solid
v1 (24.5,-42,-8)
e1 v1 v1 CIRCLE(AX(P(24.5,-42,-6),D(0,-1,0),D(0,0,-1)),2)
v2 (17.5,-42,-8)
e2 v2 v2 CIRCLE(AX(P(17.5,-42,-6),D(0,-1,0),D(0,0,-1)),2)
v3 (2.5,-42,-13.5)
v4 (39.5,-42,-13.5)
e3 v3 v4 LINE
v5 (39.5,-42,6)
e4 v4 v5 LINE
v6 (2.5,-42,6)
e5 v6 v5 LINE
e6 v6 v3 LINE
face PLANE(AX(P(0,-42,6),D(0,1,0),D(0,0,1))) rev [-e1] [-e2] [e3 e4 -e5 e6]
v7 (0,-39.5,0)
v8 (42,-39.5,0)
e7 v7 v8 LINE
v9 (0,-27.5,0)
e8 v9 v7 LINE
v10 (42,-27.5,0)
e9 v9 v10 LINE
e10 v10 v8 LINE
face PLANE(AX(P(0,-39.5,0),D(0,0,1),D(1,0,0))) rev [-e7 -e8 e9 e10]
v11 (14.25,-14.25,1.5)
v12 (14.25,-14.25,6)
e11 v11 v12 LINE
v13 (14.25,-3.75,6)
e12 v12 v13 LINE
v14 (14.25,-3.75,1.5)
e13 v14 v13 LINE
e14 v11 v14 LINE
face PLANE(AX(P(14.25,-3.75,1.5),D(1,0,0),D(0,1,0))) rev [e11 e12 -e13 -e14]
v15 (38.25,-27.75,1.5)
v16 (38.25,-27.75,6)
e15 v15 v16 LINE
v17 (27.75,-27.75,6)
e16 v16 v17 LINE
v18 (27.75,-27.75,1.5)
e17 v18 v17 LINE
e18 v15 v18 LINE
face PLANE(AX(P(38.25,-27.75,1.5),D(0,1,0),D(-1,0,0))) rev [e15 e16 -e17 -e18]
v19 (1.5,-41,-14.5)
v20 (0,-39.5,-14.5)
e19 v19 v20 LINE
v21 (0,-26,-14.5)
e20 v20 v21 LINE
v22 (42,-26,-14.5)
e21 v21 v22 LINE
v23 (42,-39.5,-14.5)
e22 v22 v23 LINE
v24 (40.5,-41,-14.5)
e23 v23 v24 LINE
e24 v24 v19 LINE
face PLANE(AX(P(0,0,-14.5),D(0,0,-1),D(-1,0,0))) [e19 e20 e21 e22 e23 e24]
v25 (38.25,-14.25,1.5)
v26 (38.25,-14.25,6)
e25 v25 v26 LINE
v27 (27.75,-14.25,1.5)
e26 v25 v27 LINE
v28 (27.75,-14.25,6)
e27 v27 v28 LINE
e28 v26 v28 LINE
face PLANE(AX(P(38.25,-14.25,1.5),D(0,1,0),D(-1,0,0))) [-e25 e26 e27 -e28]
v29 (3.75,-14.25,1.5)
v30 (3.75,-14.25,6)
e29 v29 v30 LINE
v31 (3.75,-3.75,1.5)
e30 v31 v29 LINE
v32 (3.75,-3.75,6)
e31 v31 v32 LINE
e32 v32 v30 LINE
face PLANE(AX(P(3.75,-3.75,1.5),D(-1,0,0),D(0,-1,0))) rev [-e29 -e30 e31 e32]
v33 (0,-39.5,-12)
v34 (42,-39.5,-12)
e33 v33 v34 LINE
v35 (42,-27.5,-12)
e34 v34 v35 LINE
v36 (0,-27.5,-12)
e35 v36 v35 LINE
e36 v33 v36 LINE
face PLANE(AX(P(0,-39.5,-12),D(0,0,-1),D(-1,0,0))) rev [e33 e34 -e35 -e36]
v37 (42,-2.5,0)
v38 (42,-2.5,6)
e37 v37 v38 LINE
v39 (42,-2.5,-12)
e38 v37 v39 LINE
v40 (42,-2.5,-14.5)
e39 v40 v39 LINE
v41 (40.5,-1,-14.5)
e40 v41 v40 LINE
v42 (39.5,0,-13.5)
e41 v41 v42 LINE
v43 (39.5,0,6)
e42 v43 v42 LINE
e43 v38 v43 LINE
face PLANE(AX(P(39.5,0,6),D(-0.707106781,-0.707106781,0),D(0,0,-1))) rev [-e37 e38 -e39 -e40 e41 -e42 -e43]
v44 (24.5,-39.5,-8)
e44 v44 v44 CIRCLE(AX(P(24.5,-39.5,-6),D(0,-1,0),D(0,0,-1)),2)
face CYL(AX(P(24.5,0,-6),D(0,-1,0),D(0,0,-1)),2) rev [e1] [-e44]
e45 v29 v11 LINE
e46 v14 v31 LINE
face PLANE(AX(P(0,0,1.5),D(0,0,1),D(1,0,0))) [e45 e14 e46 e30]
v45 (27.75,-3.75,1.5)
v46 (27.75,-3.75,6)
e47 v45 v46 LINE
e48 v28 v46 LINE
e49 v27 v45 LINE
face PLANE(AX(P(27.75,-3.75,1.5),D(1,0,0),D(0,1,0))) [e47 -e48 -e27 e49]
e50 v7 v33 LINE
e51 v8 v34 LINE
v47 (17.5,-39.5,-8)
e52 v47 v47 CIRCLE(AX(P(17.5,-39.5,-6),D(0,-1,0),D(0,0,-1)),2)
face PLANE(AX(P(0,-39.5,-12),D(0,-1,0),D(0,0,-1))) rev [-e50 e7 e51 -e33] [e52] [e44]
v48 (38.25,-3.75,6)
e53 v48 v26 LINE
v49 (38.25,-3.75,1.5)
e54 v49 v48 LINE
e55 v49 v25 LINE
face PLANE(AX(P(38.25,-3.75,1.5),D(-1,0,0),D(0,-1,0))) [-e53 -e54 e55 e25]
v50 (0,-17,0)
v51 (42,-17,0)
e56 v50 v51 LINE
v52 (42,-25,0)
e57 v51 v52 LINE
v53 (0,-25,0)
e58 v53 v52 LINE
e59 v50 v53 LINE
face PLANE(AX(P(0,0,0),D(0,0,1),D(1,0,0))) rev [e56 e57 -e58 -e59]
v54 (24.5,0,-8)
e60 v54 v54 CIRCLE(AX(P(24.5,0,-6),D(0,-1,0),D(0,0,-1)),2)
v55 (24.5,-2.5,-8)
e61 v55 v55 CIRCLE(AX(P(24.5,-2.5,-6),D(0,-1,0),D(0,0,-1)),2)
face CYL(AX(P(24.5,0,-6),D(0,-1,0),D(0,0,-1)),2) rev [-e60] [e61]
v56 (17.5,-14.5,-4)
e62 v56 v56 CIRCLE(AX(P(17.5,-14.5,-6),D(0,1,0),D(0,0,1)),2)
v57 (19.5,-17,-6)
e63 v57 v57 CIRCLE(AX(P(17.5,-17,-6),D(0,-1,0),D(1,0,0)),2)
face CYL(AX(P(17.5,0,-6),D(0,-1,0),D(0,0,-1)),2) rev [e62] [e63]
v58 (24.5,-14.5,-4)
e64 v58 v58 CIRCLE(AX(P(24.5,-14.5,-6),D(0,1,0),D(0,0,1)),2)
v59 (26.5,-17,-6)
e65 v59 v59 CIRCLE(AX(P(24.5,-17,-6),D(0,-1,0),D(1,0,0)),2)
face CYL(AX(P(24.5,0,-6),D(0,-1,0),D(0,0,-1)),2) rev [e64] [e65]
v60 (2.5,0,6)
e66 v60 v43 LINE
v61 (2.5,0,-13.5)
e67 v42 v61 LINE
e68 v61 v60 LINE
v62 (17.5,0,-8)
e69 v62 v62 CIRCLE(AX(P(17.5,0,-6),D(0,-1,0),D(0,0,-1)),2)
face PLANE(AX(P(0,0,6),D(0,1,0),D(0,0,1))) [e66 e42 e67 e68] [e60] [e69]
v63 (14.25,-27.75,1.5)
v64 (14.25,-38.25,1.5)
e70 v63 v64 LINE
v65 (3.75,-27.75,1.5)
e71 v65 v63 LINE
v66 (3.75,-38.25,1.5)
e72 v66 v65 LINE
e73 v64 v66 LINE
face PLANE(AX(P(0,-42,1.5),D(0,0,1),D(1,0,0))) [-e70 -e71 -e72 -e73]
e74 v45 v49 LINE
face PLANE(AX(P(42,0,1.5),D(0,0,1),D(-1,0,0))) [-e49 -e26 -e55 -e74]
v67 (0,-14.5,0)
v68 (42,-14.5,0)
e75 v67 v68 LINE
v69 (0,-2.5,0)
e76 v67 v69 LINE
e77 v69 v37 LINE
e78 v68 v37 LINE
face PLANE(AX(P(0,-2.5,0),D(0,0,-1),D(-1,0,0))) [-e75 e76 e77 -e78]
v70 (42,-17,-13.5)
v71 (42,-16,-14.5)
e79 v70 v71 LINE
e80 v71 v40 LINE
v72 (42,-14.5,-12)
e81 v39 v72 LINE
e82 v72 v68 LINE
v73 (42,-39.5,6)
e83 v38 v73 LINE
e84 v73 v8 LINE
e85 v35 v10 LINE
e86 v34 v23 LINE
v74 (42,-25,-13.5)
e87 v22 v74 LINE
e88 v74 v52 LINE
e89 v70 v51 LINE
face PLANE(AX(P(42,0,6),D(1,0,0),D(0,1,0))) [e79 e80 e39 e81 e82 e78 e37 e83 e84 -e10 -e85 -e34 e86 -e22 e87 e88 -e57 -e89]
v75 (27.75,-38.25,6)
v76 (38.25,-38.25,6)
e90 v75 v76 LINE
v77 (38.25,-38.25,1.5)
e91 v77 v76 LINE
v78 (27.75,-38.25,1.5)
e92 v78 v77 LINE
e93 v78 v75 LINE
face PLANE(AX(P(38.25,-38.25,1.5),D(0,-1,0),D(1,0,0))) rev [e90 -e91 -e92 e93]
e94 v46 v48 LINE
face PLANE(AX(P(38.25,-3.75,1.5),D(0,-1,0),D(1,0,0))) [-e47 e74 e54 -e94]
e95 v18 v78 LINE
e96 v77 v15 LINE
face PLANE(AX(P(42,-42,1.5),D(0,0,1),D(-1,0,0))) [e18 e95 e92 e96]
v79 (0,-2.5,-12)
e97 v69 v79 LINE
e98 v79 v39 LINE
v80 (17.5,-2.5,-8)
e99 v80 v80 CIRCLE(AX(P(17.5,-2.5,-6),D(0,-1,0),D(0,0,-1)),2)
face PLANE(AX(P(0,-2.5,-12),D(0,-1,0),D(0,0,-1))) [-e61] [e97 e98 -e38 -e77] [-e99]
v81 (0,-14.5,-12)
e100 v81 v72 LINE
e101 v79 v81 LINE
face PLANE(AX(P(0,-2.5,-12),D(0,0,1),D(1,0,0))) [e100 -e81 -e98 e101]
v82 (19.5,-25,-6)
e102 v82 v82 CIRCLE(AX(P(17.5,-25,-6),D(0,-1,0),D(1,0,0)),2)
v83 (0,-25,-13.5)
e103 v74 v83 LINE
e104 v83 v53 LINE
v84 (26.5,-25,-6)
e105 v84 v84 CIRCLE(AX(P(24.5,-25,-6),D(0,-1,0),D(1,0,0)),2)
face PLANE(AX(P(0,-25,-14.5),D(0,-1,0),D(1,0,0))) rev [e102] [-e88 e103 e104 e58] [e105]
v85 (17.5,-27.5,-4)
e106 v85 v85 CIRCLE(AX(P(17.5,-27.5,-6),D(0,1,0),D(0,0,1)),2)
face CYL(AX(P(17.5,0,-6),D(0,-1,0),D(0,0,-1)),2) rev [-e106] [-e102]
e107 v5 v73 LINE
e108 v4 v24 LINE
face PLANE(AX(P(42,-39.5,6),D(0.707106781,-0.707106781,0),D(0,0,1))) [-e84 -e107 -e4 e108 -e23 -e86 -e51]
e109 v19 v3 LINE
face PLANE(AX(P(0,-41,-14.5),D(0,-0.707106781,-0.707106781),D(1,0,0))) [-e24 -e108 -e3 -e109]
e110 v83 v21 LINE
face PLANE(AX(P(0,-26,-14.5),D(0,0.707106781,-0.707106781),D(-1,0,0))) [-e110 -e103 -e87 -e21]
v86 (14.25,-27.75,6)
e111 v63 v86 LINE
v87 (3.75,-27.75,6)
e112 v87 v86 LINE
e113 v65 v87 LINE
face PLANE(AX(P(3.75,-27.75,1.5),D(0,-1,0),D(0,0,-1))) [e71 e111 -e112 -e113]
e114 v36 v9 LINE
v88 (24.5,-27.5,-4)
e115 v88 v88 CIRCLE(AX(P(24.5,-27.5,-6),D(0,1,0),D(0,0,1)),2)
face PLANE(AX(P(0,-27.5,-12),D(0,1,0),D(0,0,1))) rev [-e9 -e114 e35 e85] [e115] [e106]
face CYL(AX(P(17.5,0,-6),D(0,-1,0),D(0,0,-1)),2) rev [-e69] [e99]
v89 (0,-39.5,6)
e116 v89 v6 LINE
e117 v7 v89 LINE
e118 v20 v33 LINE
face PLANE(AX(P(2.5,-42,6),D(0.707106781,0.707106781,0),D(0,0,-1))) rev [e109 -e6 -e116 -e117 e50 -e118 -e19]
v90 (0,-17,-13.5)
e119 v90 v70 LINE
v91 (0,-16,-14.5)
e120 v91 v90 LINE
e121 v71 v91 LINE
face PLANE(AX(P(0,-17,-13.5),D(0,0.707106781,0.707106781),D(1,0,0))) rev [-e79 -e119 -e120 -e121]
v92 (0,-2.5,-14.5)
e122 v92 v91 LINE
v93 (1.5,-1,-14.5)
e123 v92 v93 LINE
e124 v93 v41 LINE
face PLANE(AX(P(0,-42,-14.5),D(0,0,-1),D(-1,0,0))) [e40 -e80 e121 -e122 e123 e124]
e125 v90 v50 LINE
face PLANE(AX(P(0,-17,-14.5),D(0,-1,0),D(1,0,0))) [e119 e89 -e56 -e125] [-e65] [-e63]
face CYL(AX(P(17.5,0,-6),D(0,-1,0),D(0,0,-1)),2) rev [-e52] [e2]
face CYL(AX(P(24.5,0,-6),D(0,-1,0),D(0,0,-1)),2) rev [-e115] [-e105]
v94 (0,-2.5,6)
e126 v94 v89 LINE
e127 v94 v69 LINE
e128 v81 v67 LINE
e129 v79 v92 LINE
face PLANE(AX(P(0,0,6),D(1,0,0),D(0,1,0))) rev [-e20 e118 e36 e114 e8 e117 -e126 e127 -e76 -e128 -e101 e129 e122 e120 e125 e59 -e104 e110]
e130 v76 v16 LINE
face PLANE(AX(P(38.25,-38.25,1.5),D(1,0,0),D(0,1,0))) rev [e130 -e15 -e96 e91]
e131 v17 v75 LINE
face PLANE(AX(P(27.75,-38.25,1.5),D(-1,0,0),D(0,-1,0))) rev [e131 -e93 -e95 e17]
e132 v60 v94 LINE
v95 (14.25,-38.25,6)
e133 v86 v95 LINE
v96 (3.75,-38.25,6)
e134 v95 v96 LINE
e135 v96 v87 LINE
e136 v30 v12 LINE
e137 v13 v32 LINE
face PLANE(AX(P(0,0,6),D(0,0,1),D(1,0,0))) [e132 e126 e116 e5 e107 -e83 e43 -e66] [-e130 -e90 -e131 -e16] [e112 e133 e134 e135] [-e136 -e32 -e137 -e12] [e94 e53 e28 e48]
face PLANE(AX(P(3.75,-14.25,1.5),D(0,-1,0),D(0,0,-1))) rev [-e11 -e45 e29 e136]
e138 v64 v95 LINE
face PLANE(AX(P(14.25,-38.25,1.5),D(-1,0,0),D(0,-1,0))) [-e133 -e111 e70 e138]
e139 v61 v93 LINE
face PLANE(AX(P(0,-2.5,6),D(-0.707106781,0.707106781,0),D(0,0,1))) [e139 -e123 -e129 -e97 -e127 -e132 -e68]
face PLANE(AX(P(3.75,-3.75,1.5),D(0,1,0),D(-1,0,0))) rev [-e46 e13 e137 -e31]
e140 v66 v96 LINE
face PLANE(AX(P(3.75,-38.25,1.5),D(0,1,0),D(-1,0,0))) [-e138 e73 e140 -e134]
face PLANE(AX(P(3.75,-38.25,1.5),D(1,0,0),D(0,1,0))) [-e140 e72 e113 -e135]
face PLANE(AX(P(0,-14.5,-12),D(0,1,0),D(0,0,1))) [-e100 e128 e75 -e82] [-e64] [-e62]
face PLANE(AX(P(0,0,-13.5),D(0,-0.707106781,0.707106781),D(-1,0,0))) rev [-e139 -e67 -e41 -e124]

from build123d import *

# Parameters (mm, degrees)
ESQUISSE1_W               = 42
ESQUISSE1_H               = 42
BOSS_EXTRU_1_DEPTH        = 6
ESQUISSE2_W               = 42
ESQUISSE2_H               = 17
BOSS_EXTRU_3_DEPTH        = 14.5
ESQUISSE3_W               = 12
ESQUISSE3_H               = 12
ENL_V_MAT_EXTRU_3_DEPTH   = 62.141229952
ESQUISSE4_R               = 2
ENL_V_MAT_EXTRU_4_DEPTH   = 42
CHANFREIN1_SIZE           = 2.5
ESQUISSE5_W               = 10.5
ESQUISSE5_H               = 10.5
ENL_V_MAT_EXTRU_5_DEPTH   = 4.5
SYM_TRIE3_COPY_1_SKETCH_W = 10.5
SYM_TRIE3_COPY_1_SKETCH_H = 10.5
SYM_TRIE3_COPY_1_DEPTH    = 4.5
CHANFREIN2_SIZE           = 1


with BuildPart() as part:
    # Esquisse1 → Boss.-Extru.1 (new body)
    with BuildSketch(Plane.XY):
        with Locations((21, -21)):
            Rectangle(ESQUISSE1_W, ESQUISSE1_H)
    extrude(amount=BOSS_EXTRU_1_DEPTH)

    # Esquisse2 → Boss.-Extru.3 (add)
    with BuildSketch(Plane(origin=(0, 0, 0), x_dir=(-1, 0, 0), z_dir=(0, 0, -1))):
        with Locations((-21, -33.5)):
            Rectangle(ESQUISSE2_W, ESQUISSE2_H)
    boss_extru_3 = extrude(amount=BOSS_EXTRU_3_DEPTH)

    # Esquisse3 → Enlèv. mat.-Extru.3 (cut, through all)
    with BuildSketch(Plane(origin=(42, 0, 0), x_dir=(0, 0, -1), z_dir=(1, 0, 0))):
        with Locations((6, -33.5)):
            Rectangle(ESQUISSE3_W, ESQUISSE3_H)
    enl_v_mat_extru_3 = extrude(amount=-ENL_V_MAT_EXTRU_3_DEPTH, mode=Mode.SUBTRACT)

    # Symétrie1: Boss.-Extru.3, Enlèv. mat.-Extru.3 across plane
    add(boss_extru_3.mirror(Plane(origin=(0, -21, 0), x_dir=(0, 0, 1), z_dir=(0, -1, 0))))
    add(enl_v_mat_extru_3.mirror(Plane(origin=(0, -21, 0), x_dir=(0, 0, 1), z_dir=(0, -1, 0))), mode=Mode.SUBTRACT)

    # Esquisse4 → Enlèv. mat.-Extru.4 (cut)
    with BuildSketch(Plane.XZ.offset(42)):
        with Locations(Location((24.5, -6, 0), (0, 0, 270))):
            Circle(ESQUISSE4_R)
        with Locations(Location((17.5, -6, 0), (0, 0, 270))):
            Circle(ESQUISSE4_R)
    extrude(amount=-ENL_V_MAT_EXTRU_4_DEPTH, mode=Mode.SUBTRACT)

    # Chanfrein1
    chanfrein1_edges = [part.edges().sort_by_distance(p)[0] for p in [
        (42, -42, -4.25),
        (0, -42, -4.25),
        (0, 0, -4.25),
        (42, 0, -4.25),
    ]]
    chamfer(chanfrein1_edges, length=CHANFREIN1_SIZE - 0.0001)  # a hair under: the kernel refuses the full size

    # Esquisse5 → Enlèv. mat.-Extru.5 (cut)
    with BuildSketch(Plane.XY.offset(6)):
        with Locations((9, -9)):
            Rectangle(ESQUISSE5_W, ESQUISSE5_H)
    enl_v_mat_extru_5 = extrude(amount=-ENL_V_MAT_EXTRU_5_DEPTH, mode=Mode.SUBTRACT)

    # Symétrie2: Enlèv. mat.-Extru.5 across plane
    add(enl_v_mat_extru_5.mirror(Plane.ZY.offset(-21)), mode=Mode.SUBTRACT)

    # Symétrie3: Enlèv. mat.-Extru.5 across plane
    add(enl_v_mat_extru_5.mirror(Plane(origin=(0, -21, 0), x_dir=(0, 0, 1), z_dir=(0, -1, 0))), mode=Mode.SUBTRACT)

    # Symétrie3 copy 1 sketch → Symétrie3 copy 1 (cut)
    with BuildSketch(Plane(origin=(42, -42, 6), x_dir=(-1, 0, 0), z_dir=(0, 0, 1))):
        with Locations((9, -9)):
            Rectangle(SYM_TRIE3_COPY_1_SKETCH_W, SYM_TRIE3_COPY_1_SKETCH_H)
    extrude(amount=-SYM_TRIE3_COPY_1_DEPTH, mode=Mode.SUBTRACT)

    # Chanfrein2
    chanfrein2_edges = [part.edges().sort_by_distance(p)[0] for p in [
        (21, 0, -14.5),
        (21, -42, -14.5),
        (21, -25, -14.5),
        (21, -17, -14.5),
    ]]
    chamfer(chanfrein2_edges, length=CHANFREIN2_SIZE)


solid = part.part
